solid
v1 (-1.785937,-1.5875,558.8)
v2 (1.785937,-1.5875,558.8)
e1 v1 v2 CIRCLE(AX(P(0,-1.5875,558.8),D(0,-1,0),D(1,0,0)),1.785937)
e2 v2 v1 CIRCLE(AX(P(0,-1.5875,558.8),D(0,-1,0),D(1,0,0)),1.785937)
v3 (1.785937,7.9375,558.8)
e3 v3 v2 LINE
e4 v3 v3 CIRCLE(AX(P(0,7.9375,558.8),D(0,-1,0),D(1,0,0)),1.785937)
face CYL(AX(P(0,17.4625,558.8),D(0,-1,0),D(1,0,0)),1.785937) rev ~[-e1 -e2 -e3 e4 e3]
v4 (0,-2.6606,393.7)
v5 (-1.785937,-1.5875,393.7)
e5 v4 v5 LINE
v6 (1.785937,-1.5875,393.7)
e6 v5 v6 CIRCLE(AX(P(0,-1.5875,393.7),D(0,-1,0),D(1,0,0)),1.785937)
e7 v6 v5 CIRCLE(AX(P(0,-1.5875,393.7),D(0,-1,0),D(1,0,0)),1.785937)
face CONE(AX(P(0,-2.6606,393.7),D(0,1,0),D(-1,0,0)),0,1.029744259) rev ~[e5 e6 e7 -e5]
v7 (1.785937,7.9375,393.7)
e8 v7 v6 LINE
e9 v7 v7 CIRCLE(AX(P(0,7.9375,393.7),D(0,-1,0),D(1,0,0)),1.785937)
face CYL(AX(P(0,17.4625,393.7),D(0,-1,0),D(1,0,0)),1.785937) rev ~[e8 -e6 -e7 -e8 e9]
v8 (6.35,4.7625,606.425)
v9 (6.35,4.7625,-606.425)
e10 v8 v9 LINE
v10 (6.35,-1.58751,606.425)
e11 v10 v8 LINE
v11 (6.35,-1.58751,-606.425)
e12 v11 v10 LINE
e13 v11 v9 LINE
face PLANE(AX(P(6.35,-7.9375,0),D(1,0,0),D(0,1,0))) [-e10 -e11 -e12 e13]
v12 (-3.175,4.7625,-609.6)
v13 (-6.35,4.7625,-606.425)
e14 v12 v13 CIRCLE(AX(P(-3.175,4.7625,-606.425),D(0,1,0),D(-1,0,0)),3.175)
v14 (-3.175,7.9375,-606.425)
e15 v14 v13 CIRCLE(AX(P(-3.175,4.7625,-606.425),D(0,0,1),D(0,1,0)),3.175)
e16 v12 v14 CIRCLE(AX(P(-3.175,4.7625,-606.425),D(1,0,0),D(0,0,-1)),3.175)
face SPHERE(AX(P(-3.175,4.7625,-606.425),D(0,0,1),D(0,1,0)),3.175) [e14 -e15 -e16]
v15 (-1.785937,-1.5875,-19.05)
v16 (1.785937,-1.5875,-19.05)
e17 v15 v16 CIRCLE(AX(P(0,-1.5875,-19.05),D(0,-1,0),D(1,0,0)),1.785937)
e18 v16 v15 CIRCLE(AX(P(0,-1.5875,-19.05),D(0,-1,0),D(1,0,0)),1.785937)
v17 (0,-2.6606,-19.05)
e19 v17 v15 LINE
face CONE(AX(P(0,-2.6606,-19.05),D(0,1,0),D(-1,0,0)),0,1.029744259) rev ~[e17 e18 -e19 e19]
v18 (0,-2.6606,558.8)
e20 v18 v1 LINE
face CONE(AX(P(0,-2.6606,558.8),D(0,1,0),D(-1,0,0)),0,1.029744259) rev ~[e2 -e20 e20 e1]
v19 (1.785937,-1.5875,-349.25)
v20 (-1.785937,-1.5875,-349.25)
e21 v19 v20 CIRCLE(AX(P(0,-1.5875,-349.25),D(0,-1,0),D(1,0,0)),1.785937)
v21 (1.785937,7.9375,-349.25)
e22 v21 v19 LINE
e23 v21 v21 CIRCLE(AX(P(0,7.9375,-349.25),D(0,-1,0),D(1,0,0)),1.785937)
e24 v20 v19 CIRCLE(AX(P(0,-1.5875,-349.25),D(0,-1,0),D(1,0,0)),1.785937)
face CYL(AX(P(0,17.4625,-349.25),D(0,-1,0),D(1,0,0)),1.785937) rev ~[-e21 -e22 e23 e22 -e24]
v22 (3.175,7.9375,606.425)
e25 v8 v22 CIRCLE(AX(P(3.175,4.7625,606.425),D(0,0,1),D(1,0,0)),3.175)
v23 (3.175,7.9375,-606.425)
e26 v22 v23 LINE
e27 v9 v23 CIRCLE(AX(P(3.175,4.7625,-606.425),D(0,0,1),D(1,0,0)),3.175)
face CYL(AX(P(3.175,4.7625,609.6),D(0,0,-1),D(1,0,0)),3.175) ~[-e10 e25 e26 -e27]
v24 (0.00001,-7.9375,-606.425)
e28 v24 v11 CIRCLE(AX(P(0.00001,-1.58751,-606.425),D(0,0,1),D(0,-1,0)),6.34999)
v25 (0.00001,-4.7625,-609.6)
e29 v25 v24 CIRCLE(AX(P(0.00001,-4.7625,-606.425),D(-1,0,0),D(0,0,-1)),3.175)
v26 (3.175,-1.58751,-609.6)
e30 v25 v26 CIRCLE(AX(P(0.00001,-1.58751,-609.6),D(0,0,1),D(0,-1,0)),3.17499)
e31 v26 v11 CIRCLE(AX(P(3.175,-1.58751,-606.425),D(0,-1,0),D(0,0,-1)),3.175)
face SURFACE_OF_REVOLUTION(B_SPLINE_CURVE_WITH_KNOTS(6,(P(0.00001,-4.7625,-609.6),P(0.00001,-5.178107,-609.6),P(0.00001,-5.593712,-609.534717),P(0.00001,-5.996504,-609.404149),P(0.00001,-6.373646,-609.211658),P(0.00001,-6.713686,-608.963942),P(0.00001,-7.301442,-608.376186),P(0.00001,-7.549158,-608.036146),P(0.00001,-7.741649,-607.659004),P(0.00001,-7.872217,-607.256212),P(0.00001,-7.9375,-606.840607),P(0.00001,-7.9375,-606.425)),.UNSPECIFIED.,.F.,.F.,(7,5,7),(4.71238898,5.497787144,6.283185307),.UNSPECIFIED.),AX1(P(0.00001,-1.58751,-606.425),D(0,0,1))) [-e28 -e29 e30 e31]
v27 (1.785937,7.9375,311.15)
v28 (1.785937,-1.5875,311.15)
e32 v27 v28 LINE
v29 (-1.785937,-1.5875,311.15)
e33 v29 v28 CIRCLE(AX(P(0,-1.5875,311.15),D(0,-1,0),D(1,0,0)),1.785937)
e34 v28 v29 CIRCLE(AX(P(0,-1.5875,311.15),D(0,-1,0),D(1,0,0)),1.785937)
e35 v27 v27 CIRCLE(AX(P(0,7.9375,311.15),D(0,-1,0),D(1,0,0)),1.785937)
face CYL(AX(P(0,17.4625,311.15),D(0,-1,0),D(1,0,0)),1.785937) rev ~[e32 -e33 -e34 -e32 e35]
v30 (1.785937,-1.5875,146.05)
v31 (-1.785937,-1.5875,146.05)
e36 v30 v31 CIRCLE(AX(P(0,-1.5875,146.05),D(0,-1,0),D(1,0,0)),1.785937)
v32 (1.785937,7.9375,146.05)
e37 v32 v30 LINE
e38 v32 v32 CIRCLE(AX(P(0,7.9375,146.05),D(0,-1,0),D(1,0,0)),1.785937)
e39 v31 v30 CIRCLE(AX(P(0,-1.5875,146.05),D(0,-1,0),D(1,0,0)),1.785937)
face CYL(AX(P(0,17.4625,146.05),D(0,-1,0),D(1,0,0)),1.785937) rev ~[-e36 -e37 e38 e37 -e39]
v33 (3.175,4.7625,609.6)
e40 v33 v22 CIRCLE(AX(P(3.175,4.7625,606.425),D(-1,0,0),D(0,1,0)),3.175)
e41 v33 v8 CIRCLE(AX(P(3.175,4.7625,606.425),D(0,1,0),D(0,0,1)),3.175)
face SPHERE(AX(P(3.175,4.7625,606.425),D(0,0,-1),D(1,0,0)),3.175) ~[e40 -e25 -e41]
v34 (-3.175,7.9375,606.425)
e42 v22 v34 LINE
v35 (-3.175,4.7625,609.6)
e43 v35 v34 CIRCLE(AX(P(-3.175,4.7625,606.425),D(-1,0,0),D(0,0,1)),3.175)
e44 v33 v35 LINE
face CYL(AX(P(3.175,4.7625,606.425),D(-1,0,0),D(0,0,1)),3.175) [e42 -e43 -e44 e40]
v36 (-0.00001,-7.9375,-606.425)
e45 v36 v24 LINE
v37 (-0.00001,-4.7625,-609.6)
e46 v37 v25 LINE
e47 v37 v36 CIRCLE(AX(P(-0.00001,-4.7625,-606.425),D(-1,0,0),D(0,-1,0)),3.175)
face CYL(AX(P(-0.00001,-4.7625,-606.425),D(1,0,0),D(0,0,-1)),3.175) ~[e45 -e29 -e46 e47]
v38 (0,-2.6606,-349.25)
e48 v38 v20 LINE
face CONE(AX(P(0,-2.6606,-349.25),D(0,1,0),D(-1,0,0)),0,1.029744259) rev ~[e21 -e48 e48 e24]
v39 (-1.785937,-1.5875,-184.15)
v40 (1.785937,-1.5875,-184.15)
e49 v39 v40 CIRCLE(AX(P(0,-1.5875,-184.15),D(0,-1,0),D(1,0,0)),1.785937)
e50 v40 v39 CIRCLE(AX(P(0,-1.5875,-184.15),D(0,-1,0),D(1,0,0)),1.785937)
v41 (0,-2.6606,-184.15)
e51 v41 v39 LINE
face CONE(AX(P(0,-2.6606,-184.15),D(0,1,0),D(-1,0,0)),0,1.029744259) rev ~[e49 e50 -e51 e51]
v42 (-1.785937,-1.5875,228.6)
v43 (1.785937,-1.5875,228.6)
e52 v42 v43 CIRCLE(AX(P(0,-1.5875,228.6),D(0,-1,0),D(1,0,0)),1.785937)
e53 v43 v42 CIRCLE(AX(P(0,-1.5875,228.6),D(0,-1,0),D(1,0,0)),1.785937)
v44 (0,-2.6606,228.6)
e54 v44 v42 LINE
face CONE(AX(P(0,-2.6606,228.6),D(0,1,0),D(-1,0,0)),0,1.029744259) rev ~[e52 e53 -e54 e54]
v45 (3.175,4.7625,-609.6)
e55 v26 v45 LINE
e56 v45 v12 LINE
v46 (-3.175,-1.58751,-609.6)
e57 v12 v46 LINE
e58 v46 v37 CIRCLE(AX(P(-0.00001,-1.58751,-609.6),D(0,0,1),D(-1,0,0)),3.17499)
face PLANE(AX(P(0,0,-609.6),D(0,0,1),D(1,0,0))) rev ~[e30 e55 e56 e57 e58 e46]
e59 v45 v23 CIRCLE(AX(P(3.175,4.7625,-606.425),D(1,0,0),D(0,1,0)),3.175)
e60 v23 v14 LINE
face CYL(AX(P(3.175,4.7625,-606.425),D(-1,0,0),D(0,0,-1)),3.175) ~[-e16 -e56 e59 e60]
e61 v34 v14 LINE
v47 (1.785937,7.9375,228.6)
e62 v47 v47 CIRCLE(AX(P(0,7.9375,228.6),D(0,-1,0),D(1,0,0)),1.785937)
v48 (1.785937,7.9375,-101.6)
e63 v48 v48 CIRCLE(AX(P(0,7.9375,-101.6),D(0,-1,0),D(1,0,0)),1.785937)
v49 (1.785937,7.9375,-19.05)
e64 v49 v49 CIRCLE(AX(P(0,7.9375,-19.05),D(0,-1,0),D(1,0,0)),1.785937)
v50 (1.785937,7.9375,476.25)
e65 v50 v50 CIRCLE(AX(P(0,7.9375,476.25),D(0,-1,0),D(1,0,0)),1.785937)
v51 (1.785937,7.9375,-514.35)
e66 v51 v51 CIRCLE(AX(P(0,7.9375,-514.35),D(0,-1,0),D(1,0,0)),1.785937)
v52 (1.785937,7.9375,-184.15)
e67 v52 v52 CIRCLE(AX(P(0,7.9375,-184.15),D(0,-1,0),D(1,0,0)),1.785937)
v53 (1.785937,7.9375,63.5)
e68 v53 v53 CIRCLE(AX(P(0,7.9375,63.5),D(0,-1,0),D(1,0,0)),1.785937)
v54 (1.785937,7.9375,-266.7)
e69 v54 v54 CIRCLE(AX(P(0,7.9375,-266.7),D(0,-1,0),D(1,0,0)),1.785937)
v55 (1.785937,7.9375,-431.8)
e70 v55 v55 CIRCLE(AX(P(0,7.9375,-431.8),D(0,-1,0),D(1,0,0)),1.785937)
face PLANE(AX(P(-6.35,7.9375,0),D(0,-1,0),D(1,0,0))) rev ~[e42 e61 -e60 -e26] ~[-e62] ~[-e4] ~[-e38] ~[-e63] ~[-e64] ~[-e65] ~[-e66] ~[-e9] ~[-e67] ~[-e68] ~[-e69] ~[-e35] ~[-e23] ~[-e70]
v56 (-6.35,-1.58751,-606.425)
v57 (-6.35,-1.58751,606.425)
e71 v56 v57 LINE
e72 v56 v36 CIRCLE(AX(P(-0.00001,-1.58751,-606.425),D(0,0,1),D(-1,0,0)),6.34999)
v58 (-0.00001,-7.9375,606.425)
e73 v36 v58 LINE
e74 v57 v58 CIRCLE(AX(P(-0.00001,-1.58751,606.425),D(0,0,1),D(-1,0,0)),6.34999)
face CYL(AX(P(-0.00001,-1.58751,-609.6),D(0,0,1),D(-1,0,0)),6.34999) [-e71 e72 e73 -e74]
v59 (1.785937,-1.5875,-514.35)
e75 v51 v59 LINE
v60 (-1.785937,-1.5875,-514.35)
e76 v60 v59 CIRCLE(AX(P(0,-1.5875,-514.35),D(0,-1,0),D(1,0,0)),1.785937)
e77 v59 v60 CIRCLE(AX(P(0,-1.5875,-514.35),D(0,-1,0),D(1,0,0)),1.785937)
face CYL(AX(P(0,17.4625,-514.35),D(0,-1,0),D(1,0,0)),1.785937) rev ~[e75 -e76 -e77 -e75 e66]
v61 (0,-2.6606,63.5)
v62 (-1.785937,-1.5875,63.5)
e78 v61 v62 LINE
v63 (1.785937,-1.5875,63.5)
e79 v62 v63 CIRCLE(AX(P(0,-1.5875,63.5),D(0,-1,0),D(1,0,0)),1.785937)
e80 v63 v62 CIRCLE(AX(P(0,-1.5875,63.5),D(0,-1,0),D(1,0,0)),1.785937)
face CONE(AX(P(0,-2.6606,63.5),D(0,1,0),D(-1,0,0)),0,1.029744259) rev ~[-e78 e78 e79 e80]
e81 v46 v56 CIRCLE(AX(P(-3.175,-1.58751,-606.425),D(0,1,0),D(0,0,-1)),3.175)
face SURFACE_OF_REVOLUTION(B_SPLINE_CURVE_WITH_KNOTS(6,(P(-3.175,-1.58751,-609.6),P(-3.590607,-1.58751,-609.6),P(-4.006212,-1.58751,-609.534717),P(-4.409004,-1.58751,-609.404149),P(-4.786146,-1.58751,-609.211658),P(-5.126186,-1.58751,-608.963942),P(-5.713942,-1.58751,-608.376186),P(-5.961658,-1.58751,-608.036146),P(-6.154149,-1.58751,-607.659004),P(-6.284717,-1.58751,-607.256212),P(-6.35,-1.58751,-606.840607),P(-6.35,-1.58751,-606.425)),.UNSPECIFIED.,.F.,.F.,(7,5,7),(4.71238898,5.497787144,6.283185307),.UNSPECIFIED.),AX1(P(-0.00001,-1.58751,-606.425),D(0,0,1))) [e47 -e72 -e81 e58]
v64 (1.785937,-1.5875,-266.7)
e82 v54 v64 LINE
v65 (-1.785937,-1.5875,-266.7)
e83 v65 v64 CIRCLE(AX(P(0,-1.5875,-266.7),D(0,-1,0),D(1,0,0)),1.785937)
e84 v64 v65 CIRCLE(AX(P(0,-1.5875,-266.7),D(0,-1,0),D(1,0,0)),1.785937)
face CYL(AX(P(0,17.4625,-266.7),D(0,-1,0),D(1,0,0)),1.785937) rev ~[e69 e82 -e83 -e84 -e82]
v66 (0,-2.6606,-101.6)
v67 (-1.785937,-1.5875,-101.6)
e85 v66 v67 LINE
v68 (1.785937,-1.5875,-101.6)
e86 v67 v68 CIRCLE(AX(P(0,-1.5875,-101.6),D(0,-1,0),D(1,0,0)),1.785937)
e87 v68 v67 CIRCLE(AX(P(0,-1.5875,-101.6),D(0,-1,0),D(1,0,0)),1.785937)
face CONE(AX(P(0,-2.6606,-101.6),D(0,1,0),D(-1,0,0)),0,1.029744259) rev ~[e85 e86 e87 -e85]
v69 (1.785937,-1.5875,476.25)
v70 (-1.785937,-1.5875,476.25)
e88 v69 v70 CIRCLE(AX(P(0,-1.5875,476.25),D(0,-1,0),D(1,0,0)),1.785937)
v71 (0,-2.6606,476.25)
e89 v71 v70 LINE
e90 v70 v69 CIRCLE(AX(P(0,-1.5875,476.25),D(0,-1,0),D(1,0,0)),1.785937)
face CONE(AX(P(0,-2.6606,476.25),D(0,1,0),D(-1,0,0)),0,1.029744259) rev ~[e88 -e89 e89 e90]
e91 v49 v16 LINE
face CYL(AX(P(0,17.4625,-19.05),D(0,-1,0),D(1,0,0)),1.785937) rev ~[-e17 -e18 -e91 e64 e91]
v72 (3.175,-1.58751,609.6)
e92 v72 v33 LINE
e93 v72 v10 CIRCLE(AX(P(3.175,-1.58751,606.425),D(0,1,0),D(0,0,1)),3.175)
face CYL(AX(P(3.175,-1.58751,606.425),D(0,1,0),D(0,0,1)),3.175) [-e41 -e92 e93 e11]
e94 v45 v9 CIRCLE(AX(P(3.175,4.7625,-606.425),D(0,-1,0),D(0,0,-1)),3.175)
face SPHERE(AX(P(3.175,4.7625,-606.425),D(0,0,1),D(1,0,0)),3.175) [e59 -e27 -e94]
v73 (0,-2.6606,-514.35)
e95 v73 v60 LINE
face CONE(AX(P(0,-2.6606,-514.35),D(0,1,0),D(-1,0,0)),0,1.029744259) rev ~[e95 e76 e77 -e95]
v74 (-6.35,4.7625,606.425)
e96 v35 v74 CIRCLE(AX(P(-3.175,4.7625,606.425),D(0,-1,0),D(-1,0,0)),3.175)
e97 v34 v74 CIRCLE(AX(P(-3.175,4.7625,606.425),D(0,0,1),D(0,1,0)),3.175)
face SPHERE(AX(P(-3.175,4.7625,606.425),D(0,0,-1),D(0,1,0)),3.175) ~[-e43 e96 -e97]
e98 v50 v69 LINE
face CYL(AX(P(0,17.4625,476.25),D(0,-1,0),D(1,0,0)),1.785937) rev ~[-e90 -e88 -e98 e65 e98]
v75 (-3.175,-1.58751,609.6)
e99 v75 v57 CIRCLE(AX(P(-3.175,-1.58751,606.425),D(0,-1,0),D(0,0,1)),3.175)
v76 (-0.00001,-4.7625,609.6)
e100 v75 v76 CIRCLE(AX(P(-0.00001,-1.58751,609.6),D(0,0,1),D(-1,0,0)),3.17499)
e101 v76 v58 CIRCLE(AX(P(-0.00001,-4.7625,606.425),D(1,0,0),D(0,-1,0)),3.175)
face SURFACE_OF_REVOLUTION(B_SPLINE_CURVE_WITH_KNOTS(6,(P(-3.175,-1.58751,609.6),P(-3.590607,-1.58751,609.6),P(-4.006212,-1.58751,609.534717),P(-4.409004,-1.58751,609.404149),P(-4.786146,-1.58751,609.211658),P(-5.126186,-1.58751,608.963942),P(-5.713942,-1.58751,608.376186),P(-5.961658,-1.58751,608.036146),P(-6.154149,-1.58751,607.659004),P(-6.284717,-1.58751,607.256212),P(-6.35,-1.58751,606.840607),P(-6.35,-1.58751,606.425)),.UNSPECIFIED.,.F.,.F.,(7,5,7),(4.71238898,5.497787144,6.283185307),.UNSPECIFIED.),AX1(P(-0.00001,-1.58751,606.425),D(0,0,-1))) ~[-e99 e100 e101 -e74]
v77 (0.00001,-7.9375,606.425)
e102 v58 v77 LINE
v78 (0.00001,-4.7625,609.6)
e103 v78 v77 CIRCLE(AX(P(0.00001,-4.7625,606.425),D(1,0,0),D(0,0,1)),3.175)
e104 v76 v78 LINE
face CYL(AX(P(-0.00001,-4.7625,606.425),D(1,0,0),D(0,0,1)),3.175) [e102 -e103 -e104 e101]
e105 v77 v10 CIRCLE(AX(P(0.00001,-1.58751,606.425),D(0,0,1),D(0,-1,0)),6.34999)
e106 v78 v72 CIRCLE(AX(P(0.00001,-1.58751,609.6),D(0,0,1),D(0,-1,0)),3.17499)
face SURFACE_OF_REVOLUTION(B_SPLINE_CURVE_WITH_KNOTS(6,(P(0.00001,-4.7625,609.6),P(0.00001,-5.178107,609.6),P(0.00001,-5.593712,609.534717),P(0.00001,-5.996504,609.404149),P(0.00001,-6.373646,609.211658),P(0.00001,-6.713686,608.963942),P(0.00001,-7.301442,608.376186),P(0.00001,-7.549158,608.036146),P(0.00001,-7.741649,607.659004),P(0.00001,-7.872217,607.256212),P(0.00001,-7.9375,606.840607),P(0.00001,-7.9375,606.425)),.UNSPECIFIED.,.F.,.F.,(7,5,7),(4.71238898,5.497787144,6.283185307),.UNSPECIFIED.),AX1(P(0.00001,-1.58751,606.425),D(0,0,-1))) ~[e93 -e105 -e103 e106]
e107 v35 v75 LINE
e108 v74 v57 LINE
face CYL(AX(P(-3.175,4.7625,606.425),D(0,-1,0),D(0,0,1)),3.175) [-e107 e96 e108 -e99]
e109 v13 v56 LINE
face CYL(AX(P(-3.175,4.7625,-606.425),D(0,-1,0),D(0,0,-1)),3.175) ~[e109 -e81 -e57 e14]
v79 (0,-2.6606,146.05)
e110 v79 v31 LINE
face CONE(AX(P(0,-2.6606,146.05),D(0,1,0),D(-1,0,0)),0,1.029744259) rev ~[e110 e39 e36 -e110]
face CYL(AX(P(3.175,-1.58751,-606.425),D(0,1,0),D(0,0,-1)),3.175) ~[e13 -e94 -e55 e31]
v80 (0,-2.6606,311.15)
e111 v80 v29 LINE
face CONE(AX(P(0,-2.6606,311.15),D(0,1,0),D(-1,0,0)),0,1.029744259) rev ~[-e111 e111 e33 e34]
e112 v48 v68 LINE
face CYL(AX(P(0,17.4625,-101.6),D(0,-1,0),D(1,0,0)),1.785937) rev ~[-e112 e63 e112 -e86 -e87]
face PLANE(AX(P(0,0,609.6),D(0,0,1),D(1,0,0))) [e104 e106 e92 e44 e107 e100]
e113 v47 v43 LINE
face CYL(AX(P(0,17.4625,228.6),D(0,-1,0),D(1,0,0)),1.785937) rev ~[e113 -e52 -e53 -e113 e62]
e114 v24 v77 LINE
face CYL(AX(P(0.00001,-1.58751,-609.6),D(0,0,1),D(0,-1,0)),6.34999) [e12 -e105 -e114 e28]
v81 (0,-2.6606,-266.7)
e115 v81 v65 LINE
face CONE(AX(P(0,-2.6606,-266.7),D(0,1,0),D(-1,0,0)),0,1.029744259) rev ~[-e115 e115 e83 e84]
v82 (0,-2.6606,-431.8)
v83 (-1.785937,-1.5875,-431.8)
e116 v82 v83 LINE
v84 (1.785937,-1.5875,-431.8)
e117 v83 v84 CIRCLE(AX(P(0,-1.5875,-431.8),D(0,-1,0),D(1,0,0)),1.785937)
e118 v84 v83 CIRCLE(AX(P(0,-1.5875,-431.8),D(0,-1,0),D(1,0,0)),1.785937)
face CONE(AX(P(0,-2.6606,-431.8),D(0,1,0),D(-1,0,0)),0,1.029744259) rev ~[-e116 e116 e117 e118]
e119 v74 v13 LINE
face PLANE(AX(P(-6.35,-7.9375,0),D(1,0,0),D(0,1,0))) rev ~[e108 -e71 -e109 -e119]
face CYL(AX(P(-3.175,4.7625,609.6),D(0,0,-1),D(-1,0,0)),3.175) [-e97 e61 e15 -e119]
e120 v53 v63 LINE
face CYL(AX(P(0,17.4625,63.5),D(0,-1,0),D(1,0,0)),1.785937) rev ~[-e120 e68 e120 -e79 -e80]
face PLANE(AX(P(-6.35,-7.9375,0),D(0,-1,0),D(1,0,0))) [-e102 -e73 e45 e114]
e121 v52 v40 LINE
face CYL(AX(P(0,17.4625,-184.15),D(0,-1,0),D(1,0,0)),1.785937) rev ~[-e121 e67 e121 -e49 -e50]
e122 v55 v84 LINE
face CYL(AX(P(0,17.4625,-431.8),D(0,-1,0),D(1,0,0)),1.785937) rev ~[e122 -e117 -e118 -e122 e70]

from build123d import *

# Parameters (mm, degrees)
F0_W     = 12.7
F0_H     = 15.875
F1_DEPTH = 609.6
F2_R     = 3.175
F3_R     = 6.34999
F4_R     = 3.175
F6_D     = 3.571875
F6_DEPTH = 9.525
F6_TIP   = 1.0730995118


# Not quite as in the source:
# - a fillet or chamfer is up to 0.001 mm smaller than in the source, because OpenCascade refuses the exact size


with BuildPart() as f1:
    # F0 (on Top) → F1 (new body, symmetric)
    with BuildSketch(Plane.XY):
        Rectangle(F0_W, F0_H)
    extrude(amount=F1_DEPTH, both=True)

    # F2
    f2_edges = [f1.edges().sort_by_distance(p)[0] for p in [
        (6.35, 7.9375, 0),
        (-6.35, 7.9375, 0),
    ]]
    fillet(f2_edges, radius=F2_R)

    # F3 (radius 6.35 in the source; OpenCascade refuses exactly that, so slightly less here)
    f3_edges = [f1.edges().sort_by_distance(p)[0] for p in [
        (-6.35, -7.9375, 0),
        (6.35, -7.9375, 0),
    ]]
    fillet(f3_edges, radius=F3_R)

    # F4
    f4_edges = [f1.edges().sort_by_distance(p)[0] for p in [
        (6.35, 1.587495, 609.6),
        (4.490131, -6.077631, 609.6),
        (5.420064, 7.007564, 609.6),
        (0, -7.9375, 609.6),
        (0, 7.9375, 609.6),
        (-4.490131, -6.077631, 609.6),
        (-5.420064, 7.007564, 609.6),
        (-6.35, 1.587495, 609.6),
        (6.35, 1.587495, -609.6),
        (4.490131, -6.077631, -609.6),
        (5.420064, 7.007564, -609.6),
        (0, -7.9375, -609.6),
        (0, 7.9375, -609.6),
        (-4.490131, -6.077631, -609.6),
        (-5.420064, 7.007564, -609.6),
        (-6.35, 1.587495, -609.6),
    ]]
    fillet(f4_edges, radius=F4_R)

    # F6
    with Locations(Plane(origin=(0, 7.9375, 0), x_dir=(-1, 0, 0), z_dir=(0, 1, 0))):
        with Locations((0, 558.8), (0, 476.25), (0, 393.7), (0, 311.15), (0, 228.6), (0, 146.05), (0, 63.5), (0, -19.05), (0, -101.6), (0, -184.15), (0, -266.7), (0, -349.25), (0, -431.8), (0, -514.35)):
            Hole(F6_D / 2, depth=F6_DEPTH)
            with Locations((0, 0, -(F6_DEPTH + F6_TIP / 2))):  # 118° drill point
                Cone(0, F6_D / 2, F6_TIP, mode=Mode.SUBTRACT)


solid = f1.part
